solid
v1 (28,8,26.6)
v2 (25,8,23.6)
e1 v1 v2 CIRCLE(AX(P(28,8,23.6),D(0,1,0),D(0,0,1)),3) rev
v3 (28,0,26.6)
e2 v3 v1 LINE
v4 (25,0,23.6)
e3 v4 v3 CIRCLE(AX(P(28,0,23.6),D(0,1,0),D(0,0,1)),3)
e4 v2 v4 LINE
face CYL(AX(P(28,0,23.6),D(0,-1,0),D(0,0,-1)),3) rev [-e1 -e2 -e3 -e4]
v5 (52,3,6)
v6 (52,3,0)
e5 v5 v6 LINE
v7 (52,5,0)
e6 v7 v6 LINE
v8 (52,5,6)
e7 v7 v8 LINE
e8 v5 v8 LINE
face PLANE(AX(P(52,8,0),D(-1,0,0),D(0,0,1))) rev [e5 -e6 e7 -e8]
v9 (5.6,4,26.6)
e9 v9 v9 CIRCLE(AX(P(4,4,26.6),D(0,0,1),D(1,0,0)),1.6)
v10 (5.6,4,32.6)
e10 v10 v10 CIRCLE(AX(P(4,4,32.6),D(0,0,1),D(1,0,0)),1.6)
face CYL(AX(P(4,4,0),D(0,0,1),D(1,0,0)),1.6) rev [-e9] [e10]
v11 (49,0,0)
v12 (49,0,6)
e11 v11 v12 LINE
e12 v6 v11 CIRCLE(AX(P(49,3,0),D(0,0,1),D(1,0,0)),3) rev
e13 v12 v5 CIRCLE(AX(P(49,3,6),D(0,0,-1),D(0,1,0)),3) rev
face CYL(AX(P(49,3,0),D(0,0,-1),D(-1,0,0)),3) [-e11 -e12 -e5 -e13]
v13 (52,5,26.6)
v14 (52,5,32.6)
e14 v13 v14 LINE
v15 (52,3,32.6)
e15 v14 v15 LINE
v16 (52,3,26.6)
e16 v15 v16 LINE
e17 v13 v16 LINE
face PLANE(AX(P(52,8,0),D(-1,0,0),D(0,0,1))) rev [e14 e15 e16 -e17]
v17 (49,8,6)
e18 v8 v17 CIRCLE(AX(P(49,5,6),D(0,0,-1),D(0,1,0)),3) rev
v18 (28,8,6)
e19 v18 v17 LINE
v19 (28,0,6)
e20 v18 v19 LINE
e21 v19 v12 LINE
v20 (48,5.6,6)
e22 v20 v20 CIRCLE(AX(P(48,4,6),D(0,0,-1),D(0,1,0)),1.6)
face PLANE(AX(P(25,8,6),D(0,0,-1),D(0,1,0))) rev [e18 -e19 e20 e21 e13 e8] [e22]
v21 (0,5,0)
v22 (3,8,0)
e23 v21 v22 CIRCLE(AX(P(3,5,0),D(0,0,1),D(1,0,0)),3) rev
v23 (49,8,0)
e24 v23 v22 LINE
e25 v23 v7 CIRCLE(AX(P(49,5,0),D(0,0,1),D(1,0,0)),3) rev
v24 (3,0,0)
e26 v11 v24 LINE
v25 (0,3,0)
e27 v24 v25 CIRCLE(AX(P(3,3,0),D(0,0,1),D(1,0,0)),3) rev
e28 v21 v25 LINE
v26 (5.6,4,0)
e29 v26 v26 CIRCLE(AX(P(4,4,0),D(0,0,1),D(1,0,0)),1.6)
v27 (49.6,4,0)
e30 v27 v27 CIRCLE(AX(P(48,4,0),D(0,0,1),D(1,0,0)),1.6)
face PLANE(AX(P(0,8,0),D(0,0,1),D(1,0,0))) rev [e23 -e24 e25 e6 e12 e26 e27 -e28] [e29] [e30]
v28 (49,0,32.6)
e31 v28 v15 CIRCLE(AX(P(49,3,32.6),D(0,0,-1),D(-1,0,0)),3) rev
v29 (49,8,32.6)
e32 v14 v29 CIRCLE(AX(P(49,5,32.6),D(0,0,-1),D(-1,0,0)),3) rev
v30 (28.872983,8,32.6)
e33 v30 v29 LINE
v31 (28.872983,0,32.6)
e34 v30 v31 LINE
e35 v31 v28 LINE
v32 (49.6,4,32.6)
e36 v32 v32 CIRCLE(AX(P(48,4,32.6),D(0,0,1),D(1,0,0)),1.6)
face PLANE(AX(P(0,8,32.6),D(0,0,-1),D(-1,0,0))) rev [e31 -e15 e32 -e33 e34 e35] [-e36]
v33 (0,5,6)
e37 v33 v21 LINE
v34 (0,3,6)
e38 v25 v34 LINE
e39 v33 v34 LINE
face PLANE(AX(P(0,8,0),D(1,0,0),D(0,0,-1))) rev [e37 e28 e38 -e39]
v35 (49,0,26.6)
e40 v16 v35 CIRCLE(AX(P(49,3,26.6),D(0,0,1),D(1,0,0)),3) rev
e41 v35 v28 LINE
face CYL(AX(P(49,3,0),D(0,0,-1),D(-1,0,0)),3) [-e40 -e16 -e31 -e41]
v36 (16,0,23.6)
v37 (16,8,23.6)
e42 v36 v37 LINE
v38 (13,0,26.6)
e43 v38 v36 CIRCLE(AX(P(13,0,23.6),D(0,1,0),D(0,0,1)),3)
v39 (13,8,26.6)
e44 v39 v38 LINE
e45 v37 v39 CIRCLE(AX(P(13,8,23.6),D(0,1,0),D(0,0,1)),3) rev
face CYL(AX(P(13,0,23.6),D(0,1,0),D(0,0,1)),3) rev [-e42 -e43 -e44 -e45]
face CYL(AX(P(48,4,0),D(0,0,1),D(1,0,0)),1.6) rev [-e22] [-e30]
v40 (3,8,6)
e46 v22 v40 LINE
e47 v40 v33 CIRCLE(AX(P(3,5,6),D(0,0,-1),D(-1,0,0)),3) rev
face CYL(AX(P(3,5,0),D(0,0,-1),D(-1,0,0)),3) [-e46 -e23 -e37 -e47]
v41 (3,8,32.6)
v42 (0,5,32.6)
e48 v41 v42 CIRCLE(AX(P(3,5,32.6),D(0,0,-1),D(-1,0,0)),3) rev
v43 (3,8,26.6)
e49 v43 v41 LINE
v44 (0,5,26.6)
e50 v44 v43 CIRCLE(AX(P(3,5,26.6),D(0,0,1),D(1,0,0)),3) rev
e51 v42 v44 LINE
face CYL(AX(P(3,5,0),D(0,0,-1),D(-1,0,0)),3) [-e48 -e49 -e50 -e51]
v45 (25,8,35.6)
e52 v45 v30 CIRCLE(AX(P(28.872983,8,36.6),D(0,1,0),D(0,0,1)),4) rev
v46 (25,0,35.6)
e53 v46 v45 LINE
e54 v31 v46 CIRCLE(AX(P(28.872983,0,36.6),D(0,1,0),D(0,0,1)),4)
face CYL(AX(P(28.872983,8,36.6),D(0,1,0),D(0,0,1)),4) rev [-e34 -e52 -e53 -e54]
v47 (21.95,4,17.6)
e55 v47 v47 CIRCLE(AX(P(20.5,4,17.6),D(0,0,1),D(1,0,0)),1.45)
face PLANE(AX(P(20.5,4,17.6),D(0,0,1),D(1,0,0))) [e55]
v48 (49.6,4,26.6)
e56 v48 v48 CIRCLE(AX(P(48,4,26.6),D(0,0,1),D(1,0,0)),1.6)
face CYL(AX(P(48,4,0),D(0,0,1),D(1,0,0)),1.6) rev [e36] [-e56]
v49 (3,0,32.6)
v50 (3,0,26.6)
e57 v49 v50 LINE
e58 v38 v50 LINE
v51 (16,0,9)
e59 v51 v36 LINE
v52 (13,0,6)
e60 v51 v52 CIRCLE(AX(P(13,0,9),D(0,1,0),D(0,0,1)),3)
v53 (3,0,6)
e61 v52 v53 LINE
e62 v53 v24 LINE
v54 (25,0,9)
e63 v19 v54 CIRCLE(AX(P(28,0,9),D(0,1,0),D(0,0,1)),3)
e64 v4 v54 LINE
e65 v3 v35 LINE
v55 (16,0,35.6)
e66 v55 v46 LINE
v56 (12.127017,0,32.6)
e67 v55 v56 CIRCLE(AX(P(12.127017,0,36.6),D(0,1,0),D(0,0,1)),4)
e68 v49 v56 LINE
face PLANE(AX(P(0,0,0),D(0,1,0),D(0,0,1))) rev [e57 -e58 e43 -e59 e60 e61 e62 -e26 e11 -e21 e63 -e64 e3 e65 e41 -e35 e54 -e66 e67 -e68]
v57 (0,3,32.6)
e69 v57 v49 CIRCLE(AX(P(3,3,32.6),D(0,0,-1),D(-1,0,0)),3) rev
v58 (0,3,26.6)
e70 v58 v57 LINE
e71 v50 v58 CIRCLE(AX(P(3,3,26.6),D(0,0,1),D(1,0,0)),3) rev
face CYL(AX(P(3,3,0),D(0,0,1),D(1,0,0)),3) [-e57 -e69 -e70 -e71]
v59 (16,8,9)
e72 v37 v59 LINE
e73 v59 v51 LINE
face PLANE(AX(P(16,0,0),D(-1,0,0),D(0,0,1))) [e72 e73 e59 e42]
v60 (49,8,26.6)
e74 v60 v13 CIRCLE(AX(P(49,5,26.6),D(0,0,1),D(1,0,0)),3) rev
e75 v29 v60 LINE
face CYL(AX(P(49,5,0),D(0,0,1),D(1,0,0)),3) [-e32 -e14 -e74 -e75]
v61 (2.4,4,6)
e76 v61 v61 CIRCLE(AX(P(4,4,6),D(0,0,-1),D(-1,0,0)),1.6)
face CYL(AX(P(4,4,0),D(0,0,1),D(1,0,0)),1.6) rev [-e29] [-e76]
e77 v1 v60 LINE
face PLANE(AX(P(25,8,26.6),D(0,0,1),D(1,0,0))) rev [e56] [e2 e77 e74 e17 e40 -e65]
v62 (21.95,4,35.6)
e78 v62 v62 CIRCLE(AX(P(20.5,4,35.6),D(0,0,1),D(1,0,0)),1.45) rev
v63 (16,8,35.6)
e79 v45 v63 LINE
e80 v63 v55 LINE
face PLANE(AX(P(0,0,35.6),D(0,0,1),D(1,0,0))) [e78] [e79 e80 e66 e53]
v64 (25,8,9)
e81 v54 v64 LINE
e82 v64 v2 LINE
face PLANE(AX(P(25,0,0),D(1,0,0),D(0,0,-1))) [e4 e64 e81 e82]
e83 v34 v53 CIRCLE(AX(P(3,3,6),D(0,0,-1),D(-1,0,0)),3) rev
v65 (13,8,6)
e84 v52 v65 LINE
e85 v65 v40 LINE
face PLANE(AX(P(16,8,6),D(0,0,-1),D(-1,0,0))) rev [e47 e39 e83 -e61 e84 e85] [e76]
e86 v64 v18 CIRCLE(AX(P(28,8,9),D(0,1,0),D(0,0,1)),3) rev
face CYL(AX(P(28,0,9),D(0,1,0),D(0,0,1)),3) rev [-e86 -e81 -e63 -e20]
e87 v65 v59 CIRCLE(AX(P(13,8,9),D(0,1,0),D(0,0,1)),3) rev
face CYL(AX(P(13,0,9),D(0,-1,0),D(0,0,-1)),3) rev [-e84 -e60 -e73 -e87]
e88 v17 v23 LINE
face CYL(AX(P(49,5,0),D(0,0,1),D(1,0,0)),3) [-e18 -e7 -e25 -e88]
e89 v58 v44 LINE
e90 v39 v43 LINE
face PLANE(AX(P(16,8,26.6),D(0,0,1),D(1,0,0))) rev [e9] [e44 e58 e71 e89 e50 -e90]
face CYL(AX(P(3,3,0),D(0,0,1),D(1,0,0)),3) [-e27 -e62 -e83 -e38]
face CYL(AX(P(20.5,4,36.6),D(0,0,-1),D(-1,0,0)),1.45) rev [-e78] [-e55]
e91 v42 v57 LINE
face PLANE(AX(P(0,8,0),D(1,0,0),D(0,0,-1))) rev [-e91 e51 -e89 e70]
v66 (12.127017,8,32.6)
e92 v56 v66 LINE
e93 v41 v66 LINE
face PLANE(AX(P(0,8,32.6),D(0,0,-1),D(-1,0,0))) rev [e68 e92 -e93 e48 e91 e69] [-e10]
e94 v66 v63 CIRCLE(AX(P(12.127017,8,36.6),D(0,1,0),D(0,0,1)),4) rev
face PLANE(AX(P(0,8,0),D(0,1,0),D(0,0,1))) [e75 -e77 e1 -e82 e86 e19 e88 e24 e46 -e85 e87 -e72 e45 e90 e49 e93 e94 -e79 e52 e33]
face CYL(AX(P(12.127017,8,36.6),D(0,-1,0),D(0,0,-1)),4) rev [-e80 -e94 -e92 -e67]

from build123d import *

# Parameters (mm, degrees)
SKETCH1_W               = 52
SKETCH1_H               = 32.6
BOSS_EXTRUDE1_DEPTH     = 8
SKETCH2_W               = 20.6
SKETCH2_H               = 8
CUT_EXTRUDE1_DEPTH      = 27
SKETCH3_W               = 20.6
SKETCH3_H               = 8
CUT_EXTRUDE2_DEPTH      = 16
SKETCH5_R               = 1.6
CUT_EXTRUDE4_DEPTH      = 62.893133706
FILLET1_R               = 3
FILLET2_R               = 3
SKETCH8_W               = 9
SKETCH8_H               = 8
BOSS_EXTRUDE2_DEPTH     = 3
CUT_EXTRUDE5_DEPTH      = 4
CUT_EXTRUDE5_DEPTH_BACK = 15
SKETCH6_R               = 1.45
FILLET3_R               = 4


with BuildPart() as part:
    # Sketch1 → Boss-Extrude1 (new body)
    with BuildSketch(Plane(origin=(0, 0, 0), x_dir=(1, 0, 0), z_dir=(0, 1, 0))):
        with Locations((26, -16.3)):
            Rectangle(SKETCH1_W, SKETCH1_H)
    extrude(amount=BOSS_EXTRUDE1_DEPTH)

    # Sketch2 → Cut-Extrude1 (cut)
    with BuildSketch(Plane(origin=(52, 0, 0), x_dir=(0, 0, -1), z_dir=(1, 0, 0))):
        with Locations((-16.3, 4)):
            Rectangle(SKETCH2_W, SKETCH2_H)
    extrude(amount=-CUT_EXTRUDE1_DEPTH, mode=Mode.SUBTRACT)

    # Sketch3 → Cut-Extrude2 (cut)
    with BuildSketch(Plane.ZY):
        with Locations((16.3, 4)):
            Rectangle(SKETCH3_W, SKETCH3_H)
    extrude(amount=-CUT_EXTRUDE2_DEPTH, mode=Mode.SUBTRACT)

    # Sketch5 → Cut-Extrude4 (cut, through all)
    with BuildSketch(Plane.XY.offset(32.6)):
        with Locations((4, 4)):
            Circle(SKETCH5_R)
        with Locations((48, 4)):
            Circle(SKETCH5_R)
    extrude(amount=-CUT_EXTRUDE4_DEPTH, mode=Mode.SUBTRACT)

    # Fillet1
    fillet1_edges = [part.edges().sort_by_distance(p)[0] for p in [
        (52, 8, 29.6),
        (52, 0, 3),
        (52, 8, 3),
        (0, 0, 29.6),
        (0, 8, 29.6),
        (0, 8, 3),
        (52, 0, 29.6),
        (0, 0, 3),
    ]]
    fillet(fillet1_edges, radius=FILLET1_R)

    # Fillet2
    fillet2_edges = [part.edges().sort_by_distance(p)[0] for p in [
        (25, 4, 26.6),
        (25, 4, 6),
        (16, 4, 6),
        (16, 4, 26.6),
    ]]
    fillet(fillet2_edges, radius=FILLET2_R)

    # Sketch8 → Boss-Extrude2 (add)
    with BuildSketch(Plane.XY.offset(32.6)):
        with Locations((20.5, 4)):
            Rectangle(SKETCH8_W, SKETCH8_H)
    extrude(amount=BOSS_EXTRUDE2_DEPTH)

    # Sketch6 → Cut-Extrude5 (cut, two sides: drawn at the far end of the back side and taken through both)
    with BuildSketch(Plane.XY.offset(32.6).offset(-CUT_EXTRUDE5_DEPTH_BACK)):
        with Locations((20.5, 4)):
            Circle(SKETCH6_R)
    extrude(amount=CUT_EXTRUDE5_DEPTH + CUT_EXTRUDE5_DEPTH_BACK, mode=Mode.SUBTRACT)

    # Fillet3
    # the kernel refuses this fillet: 4 mm, written as the material it adds along each edge
    with BuildSketch(Plane(origin=(25, 8, 32.6), x_dir=(0, 0, 1), z_dir=(0, -1, 0))) as fillet3_piece_1:
        with BuildLine():
            CenterArc((4, -3.872983346), FILLET3_R, 104.477512186, 75.522487814)
            Line((0, -3.872983346), (-0.08, -3.872983346))
            Line((-0.08, -3.872983346), (-0.08, 0))
            Line((-0.08, 0), (0, 0.08))
            ThreePointArc((0, 0.08), (1.5, 0.08), (2.98, 0.077459667))
            Line((2.98, 0.077459667), (3, 0))
        make_face()
    extrude(amount=8)
    with BuildSketch(Plane(origin=(16, 0, 32.6), x_dir=(-1, 0, 0), z_dir=(0, 1, 0))) as fillet3_piece_2:
        with BuildLine():
            CenterArc((3.872983346, 4), FILLET3_R, 194.477512186, 75.522487814)
            Line((0, 3), (-0.077459667, 2.98))
            ThreePointArc((-0.077459667, 2.98), (-0.08, 1.5), (-0.08, 0))
            Line((-0.08, 0), (0, -0.08))
            Line((0, -0.08), (3.872983346, -0.08))
            Line((3.872983346, -0.08), (3.872983346, 0))
        make_face()
    extrude(amount=8)


solid = part.part
